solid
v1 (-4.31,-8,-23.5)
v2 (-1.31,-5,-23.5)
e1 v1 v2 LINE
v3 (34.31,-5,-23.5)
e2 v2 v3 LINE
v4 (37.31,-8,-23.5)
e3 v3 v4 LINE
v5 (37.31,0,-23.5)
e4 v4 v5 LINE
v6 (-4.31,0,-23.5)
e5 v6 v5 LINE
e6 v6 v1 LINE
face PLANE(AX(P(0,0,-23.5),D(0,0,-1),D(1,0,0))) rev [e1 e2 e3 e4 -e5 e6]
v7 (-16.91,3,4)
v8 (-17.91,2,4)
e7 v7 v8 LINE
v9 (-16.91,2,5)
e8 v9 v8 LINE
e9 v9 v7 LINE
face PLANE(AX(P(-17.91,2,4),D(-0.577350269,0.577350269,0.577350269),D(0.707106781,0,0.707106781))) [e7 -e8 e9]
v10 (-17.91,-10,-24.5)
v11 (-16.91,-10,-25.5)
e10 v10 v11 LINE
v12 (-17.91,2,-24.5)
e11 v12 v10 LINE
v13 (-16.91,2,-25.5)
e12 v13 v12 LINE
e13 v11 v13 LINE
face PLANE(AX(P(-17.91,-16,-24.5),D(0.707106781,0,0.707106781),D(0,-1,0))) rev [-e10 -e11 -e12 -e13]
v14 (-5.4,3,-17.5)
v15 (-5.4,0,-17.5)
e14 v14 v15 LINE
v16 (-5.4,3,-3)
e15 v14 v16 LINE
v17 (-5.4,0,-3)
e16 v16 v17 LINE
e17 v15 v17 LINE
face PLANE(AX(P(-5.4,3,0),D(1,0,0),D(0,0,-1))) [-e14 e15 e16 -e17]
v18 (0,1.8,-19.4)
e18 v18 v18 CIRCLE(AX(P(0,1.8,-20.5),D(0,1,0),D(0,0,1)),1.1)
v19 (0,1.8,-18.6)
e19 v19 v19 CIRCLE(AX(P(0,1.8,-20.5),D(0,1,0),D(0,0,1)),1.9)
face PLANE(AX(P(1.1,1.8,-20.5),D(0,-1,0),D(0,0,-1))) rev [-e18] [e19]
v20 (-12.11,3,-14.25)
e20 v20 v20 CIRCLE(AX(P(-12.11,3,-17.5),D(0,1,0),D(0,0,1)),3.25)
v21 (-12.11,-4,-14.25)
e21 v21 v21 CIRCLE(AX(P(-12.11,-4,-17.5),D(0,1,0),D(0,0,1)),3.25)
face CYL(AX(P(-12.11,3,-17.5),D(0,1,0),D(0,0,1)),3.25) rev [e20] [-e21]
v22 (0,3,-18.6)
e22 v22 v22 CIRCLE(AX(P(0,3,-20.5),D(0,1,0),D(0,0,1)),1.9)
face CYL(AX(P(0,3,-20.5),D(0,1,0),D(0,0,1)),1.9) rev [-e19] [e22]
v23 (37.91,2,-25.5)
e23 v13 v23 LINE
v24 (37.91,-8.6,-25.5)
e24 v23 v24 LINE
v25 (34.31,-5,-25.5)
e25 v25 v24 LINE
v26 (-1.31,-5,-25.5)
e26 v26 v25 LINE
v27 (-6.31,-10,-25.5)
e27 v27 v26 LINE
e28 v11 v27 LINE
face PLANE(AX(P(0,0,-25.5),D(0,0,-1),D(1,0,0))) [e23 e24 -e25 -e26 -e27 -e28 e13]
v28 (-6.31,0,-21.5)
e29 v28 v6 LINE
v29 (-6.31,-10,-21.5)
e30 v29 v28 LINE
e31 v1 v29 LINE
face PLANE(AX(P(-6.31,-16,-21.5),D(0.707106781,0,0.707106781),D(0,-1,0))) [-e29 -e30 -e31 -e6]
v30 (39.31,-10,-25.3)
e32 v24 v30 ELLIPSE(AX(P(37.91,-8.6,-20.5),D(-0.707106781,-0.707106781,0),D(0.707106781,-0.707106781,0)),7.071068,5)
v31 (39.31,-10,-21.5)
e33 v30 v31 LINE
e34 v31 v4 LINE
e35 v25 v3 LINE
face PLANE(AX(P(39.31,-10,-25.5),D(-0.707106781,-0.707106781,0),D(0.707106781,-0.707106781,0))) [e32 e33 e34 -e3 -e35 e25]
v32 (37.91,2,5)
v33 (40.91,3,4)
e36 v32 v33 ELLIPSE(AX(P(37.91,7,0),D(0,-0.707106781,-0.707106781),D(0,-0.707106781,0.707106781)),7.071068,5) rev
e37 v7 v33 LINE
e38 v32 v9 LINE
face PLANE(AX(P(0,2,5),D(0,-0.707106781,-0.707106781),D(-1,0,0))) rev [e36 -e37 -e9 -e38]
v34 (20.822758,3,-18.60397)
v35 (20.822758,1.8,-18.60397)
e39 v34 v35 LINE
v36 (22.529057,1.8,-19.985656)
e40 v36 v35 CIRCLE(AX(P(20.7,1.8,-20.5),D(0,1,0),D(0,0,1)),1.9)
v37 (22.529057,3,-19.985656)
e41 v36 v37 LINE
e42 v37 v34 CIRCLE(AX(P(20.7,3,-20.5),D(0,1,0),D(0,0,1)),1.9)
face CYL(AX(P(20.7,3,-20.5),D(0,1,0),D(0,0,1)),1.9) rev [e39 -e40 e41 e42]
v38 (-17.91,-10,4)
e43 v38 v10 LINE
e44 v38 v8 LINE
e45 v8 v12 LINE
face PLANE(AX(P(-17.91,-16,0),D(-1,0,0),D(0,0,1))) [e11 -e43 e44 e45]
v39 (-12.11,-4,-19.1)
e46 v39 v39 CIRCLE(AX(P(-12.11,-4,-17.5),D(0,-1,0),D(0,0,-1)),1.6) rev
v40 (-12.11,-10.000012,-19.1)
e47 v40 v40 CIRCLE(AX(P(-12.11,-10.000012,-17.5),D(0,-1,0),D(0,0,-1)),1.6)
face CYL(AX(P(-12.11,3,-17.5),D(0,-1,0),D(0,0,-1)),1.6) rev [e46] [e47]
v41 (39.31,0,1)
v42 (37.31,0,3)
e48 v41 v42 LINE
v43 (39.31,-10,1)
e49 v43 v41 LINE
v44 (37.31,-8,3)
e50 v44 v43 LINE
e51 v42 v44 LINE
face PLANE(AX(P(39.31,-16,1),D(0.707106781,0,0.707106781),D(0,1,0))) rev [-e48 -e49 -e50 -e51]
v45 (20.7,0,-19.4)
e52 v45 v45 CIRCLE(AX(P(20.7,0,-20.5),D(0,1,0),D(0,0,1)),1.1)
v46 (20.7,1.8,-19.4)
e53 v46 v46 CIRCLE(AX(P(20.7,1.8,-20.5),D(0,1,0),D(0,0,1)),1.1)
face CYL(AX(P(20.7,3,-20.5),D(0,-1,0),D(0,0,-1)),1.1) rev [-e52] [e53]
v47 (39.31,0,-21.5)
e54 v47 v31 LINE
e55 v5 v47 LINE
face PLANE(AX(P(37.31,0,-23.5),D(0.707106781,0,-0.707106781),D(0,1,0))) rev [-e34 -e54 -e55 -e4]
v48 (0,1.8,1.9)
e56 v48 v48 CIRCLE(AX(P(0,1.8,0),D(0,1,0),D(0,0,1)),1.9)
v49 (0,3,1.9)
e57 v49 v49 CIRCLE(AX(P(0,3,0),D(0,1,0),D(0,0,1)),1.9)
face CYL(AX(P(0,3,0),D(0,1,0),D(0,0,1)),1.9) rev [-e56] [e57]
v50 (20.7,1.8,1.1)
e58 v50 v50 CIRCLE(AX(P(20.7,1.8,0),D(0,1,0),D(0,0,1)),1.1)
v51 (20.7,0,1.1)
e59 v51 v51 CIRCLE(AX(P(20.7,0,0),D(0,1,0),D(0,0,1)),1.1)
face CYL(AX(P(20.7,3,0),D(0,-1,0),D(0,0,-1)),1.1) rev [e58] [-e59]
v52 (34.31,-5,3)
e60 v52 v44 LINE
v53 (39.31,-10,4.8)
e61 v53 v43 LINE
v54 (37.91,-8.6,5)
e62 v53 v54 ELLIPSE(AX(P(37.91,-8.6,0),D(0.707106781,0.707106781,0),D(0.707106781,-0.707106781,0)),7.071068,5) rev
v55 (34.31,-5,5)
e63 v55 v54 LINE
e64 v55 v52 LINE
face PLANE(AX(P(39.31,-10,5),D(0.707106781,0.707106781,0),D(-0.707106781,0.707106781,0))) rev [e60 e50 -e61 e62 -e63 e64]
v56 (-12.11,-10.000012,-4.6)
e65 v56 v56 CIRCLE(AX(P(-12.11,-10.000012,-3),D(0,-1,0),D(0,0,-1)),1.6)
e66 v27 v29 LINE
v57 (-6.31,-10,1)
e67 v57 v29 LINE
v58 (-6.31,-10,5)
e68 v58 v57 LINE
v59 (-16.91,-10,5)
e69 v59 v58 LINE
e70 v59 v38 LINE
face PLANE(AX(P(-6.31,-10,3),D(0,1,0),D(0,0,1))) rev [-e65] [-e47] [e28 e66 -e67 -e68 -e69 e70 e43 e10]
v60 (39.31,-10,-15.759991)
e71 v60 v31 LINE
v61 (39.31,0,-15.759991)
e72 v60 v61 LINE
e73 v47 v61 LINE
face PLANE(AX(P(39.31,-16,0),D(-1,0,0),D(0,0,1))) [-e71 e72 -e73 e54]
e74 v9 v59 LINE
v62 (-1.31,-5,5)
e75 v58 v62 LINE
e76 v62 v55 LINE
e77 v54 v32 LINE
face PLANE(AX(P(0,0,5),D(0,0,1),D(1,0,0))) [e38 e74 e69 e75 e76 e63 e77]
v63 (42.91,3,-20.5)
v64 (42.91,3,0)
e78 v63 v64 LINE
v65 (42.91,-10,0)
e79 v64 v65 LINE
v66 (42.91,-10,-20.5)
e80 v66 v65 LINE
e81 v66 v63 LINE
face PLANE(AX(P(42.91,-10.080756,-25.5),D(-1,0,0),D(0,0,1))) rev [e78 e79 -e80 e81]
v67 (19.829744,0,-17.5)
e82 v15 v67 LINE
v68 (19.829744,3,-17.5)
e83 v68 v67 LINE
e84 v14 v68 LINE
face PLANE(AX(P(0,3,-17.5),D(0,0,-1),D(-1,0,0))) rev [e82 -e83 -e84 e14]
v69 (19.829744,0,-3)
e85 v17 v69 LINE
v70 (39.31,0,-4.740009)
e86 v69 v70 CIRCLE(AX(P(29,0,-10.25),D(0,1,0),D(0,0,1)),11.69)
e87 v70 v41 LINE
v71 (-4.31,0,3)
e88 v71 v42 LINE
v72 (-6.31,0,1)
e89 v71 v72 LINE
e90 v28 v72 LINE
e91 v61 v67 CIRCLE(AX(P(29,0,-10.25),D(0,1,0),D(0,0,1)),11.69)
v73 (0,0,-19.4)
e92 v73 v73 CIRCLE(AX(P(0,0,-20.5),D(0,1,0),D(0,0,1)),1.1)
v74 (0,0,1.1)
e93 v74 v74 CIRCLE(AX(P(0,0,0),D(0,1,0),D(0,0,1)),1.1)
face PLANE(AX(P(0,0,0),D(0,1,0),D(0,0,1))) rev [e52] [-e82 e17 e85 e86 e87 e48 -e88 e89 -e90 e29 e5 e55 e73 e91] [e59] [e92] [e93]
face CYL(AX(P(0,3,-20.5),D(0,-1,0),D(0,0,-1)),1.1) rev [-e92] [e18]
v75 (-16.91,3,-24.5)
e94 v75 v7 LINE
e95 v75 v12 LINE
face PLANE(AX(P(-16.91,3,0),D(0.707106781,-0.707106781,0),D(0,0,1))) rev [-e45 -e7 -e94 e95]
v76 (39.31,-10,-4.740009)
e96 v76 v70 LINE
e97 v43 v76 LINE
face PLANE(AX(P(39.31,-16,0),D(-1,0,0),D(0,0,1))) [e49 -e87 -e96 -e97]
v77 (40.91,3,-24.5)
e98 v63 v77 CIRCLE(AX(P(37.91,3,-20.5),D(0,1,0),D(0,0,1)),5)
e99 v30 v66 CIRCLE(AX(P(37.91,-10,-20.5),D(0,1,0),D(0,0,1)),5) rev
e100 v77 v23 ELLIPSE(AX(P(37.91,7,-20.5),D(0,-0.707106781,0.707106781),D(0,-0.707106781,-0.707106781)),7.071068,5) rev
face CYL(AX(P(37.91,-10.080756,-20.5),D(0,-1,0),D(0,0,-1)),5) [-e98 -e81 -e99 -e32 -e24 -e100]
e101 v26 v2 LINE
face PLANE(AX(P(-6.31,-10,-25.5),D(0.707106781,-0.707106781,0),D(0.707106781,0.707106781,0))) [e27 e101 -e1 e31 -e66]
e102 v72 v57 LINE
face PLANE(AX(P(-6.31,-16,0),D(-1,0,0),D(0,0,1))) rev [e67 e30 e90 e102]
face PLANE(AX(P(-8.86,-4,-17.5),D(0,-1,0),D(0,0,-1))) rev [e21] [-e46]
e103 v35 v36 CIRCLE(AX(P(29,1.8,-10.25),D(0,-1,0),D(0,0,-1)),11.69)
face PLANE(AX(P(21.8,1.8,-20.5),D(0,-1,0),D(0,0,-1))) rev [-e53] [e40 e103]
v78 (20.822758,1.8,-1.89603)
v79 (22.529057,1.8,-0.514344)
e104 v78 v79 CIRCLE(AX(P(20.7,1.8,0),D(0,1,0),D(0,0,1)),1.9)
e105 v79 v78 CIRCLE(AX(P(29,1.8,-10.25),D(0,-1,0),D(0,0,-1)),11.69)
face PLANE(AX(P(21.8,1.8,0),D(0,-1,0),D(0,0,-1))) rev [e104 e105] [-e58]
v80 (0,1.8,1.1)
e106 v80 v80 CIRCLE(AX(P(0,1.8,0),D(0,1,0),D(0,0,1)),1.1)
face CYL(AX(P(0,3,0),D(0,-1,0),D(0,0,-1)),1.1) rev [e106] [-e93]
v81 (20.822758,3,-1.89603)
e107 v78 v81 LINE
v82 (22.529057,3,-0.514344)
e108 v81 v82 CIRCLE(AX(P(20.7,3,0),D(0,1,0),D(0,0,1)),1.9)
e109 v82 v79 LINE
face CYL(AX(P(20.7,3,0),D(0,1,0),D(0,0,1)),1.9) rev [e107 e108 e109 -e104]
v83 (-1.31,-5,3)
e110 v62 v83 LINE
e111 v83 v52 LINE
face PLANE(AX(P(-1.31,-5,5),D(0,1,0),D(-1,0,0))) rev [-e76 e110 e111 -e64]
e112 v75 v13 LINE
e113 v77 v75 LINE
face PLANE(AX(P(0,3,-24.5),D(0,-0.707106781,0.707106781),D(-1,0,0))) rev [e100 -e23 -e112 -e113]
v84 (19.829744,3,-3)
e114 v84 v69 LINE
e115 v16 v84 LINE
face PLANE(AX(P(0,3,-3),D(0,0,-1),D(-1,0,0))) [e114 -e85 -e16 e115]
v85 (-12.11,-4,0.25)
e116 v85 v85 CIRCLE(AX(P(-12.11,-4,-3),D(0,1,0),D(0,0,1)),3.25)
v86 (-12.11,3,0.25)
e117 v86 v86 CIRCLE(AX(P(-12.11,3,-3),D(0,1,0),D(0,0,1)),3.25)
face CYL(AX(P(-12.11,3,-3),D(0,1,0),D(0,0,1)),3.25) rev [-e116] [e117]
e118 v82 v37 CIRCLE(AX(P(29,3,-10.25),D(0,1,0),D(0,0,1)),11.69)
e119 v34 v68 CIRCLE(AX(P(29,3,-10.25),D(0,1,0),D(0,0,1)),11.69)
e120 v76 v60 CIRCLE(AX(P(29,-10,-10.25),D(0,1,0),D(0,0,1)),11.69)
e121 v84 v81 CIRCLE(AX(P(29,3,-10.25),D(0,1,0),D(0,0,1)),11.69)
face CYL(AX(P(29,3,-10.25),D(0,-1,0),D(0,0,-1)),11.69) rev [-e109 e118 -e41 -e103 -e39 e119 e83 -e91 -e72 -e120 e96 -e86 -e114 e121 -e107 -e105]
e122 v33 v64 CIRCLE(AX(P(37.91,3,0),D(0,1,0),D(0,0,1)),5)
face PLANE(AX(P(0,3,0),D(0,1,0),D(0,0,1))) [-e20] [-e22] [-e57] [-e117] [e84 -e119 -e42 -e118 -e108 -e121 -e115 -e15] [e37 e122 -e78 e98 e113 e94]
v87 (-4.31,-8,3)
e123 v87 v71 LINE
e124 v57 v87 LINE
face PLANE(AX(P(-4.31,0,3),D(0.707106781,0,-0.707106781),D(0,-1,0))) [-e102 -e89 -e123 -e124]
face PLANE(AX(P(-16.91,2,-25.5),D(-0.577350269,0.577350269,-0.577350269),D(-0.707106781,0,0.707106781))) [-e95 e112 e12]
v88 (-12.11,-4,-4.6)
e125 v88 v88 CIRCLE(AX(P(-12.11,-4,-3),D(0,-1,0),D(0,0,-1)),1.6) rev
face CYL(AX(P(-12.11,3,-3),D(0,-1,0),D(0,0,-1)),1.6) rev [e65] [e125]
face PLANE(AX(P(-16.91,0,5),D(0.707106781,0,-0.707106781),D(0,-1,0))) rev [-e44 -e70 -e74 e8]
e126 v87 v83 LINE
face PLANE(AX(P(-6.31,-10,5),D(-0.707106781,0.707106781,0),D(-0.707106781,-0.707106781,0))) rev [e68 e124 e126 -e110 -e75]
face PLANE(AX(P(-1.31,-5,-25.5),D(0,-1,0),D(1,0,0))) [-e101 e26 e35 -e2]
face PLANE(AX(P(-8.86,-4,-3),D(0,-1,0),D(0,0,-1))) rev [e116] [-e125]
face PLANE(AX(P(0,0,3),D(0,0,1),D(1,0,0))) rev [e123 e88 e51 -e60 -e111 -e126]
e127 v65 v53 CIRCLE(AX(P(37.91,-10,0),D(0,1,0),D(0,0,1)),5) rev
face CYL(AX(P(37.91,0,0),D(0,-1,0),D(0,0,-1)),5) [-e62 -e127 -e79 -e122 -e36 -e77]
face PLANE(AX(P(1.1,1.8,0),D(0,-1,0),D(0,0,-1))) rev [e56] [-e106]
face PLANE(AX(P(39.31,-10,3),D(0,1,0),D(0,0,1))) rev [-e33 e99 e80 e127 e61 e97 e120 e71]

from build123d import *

# Parameters (mm, degrees)
ESQUISSE1_W                                        = 53.8
ESQUISSE1_H                                        = 26.5
ESQUISSE1_R                                        = 1.1
BOSS_EXTRU_1_DEPTH                                 = 3
CHAMBRAGE_POUR_VIS_SIX_PANS_CREUX_M1_6_D           = 2.2
CHAMBRAGE_POUR_VIS_SIX_PANS_CREUX_M1_6_CBORE_D     = 3.8
CHAMBRAGE_POUR_VIS_SIX_PANS_CREUX_M1_6_CBORE_DEPTH = 1.2
BOSS_EXTRU_2_START                                 = 16
BOSS_EXTRU_2_DEPTH                                 = 19
ESQUISSE6_W                                        = 11.6
ESQUISSE6_H                                        = 6
ENL_V_MAT_EXTRU_1_DEPTH                            = 60.582531836
ENL_V_MAT_EXTRU_2_DEPTH                            = 58.559344159
ENL_V_MAT_EXTRU_2_DEPTH_BACK                       = 58.559344159
ESQUISSE7_R                                        = 1.6
PER_AGEAVANC_1_START                               = -4
PER_AGEAVANC_1_OUTLINE_R                           = 3.25
PER_AGEAVANC_1_OUTLINE_R_2                         = 1.6
PER_AGEAVANC_1_DEPTH                               = 7
BOSS_EXTRU_3_DEPTH                                 = 2
ESQUISSE11_R                                       = 3.860993261
BOSS_EXTRU_4_DEPTH                                 = 13
ESQUISSE12_W                                       = 8
ESQUISSE12_H                                       = 30.5
ENL_V_MAT_EXTRU_3_DEPTH                            = 59.404435619
CHANFREIN1_SIZE                                    = 1
CONG_1_R                                           = 5
CHANFREIN2_SIZE                                    = 2


with BuildPart() as part:
    # Esquisse1 → Boss.-Extru.1 (new body)
    with BuildSketch(Plane(origin=(0, 0, 0), x_dir=(1, 0, 0), z_dir=(0, 1, 0))):
        with Locations((16.5, 10.25)):
            Rectangle(ESQUISSE1_W, ESQUISSE1_H)
        with Locations(Location((0, 0, 0), (0, 0, 270))):
            Circle(ESQUISSE1_R, mode=Mode.SUBTRACT)
        with Locations(Location((20.7, 0, 0), (0, 0, 270))):
            Circle(ESQUISSE1_R, mode=Mode.SUBTRACT)
        with Locations(Location((0, 20.5, 0), (0, 0, 270))):
            Circle(ESQUISSE1_R, mode=Mode.SUBTRACT)
        with BuildLine():
            Line((-5.4, 3), (-5.4, 17.5))
            Line((-5.4, 17.5), (19.829743733, 17.5))
            ThreePointArc((19.829743733, 17.5), (32.837694897, 21.29211021), (40.69, 10.25))
            ThreePointArc((40.69, 10.25), (32.837694897, -0.79211021), (19.829743733, 3))
            Line((19.829743733, 3), (-5.4, 3))
        make_face(mode=Mode.SUBTRACT)
        with Locations(Location((20.7, 20.5, 0), (0, 0, 270))):
            Circle(ESQUISSE1_R, mode=Mode.SUBTRACT)
    extrude(amount=BOSS_EXTRU_1_DEPTH)

    # Chambrage pour vis à six pans creux M1.61 (through all)
    with Locations(Plane(origin=(0, 3, 0), x_dir=(1, 0, 0), z_dir=(0, 1, 0))):
        with Locations((0, 20.5), (20.7, 20.5), (20.7, 0), (0, 0)):
            CounterBoreHole(CHAMBRAGE_POUR_VIS_SIX_PANS_CREUX_M1_6_D / 2, CHAMBRAGE_POUR_VIS_SIX_PANS_CREUX_M1_6_CBORE_D / 2, CHAMBRAGE_POUR_VIS_SIX_PANS_CREUX_M1_6_CBORE_DEPTH)

    # Esquisse4 → Boss.-Extru.2 (add)
    with BuildSketch(Plane.XZ.offset(BOSS_EXTRU_2_START)):
        Polygon((-10.4, 3), (-17.91, 3), (-17.91, -23.5), (-10.4, -23.5), (-6.31, -23.5), (-6.31, 3), align=None)
        with BuildLine():
            Line((39.31, 3), (50.91, 3))
            Line((50.91, 3), (50.91, -23.5))
            Line((50.91, -23.5), (39.31, -23.5))
            Line((39.31, -23.5), (39.31, -15.759990926))
            ThreePointArc((39.31, -15.759990926), (40.69, -10.25), (39.31, -4.740009074))
            Line((39.31, -4.740009074), (39.31, 3))
        make_face()
    extrude(amount=-BOSS_EXTRU_2_DEPTH)

    # Esquisse6 → Enlèv. mat.-Extru.1 (cut, through all)
    with BuildSketch(Plane(origin=(0, 0, -23.5), x_dir=(-1, 0, 0), z_dir=(0, 0, -1))):
        with Locations((12.11, -13)):
            Rectangle(ESQUISSE6_W, ESQUISSE6_H)
        with Locations((-45.11, -13)):
            Rectangle(ESQUISSE6_W, ESQUISSE6_H)
    extrude(amount=-ENL_V_MAT_EXTRU_1_DEPTH, mode=Mode.SUBTRACT)

    # Esquisse7 → Enlèv. mat.-Extru.2 (cut, two sides: drawn at the far end of the back side and taken through both)
    with BuildSketch(Plane.XZ.offset(10).offset(-ENL_V_MAT_EXTRU_2_DEPTH_BACK)):
        with Locations(Location((-12.11, -3, 0), (0, 0, 270))):
            Circle(ESQUISSE7_R)
        with Locations(Location((-12.11, -17.5, 0), (0, 0, 270))):
            Circle(ESQUISSE7_R)
        with Locations(Location((45.11, -10.25, 0), (0, 0, 270))):
            Circle(ESQUISSE7_R)
    extrude(amount=ENL_V_MAT_EXTRU_2_DEPTH + ENL_V_MAT_EXTRU_2_DEPTH_BACK, mode=Mode.SUBTRACT)

    # PerçageAvancé1: read off the stored shape, not the designer's step
    # PerçageAvancé1 outline → PerçageAvancé1 (cut)
    # profile 1 of 3: a face of its own
    with BuildSketch(Plane(origin=(0, 0, 0), x_dir=(1, 0, 0), z_dir=(0, 1, 0)).offset(PER_AGEAVANC_1_START)):
        with Locations((-12.11, 17.5)):
            Circle(PER_AGEAVANC_1_OUTLINE_R)
        with Locations((-12.11, 17.5)):
            Circle(PER_AGEAVANC_1_OUTLINE_R_2, mode=Mode.SUBTRACT)
    # profile 2 of 3: a face of its own
    with BuildSketch(Plane(origin=(0, 0, 0), x_dir=(1, 0, 0), z_dir=(0, 1, 0)).offset(PER_AGEAVANC_1_START)):
        with Locations((-12.11, 3)):
            Circle(PER_AGEAVANC_1_OUTLINE_R)
        with Locations((-12.11, 3)):
            Circle(PER_AGEAVANC_1_OUTLINE_R_2, mode=Mode.SUBTRACT)
    # profile 3 of 3: a face of its own
    with BuildSketch(Plane(origin=(0, 0, 0), x_dir=(1, 0, 0), z_dir=(0, 1, 0)).offset(PER_AGEAVANC_1_START)):
        with Locations((45.11, 10.25)):
            Circle(PER_AGEAVANC_1_OUTLINE_R)
        with Locations((45.11, 10.25)):
            Circle(PER_AGEAVANC_1_OUTLINE_R_2, mode=Mode.SUBTRACT)
    extrude(amount=PER_AGEAVANC_1_DEPTH, mode=Mode.SUBTRACT)

    # Esquisse10 → Boss.-Extru.3 (add)
    with BuildSketch(Plane.XY.offset(3)):
        Polygon((-6.31, -10), (-1.31, -5), (34.31, -5), (39.31, -10), (50.91, -10), (50.91, 3), (-17.91, 3), (-17.91, -10), align=None)
    boss_extru_3 = extrude(amount=BOSS_EXTRU_3_DEPTH)

    # Symétrie1: Boss.-Extru.3 across plane
    add(boss_extru_3.mirror(Plane.XY.offset(-10.25)))

    # Esquisse11 → Boss.-Extru.4 (add)
    with BuildSketch(Plane(origin=(0, 3, 0), x_dir=(1, 0, 0), z_dir=(0, 1, 0))):
        with Locations((45.11, 10.25)):
            Circle(ESQUISSE11_R)
    extrude(amount=-BOSS_EXTRU_4_DEPTH)

    # Esquisse12 → Enlèv. mat.-Extru.3 (cut, through all)
    with BuildSketch(Plane(origin=(0, 3, 0), x_dir=(1, 0, 0), z_dir=(0, 1, 0))):
        with Locations((46.91, 10.25)):
            Rectangle(ESQUISSE12_W, ESQUISSE12_H)
    extrude(amount=-ENL_V_MAT_EXTRU_3_DEPTH, mode=Mode.SUBTRACT)

    # Chanfrein1
    chanfrein1_edges = [part.edges().sort_by_distance(p)[0] for p in [
        (-17.91, -3.5, 5),
        (-17.91, -3.5, -25.5),
        (12.5, 3, -25.5),
        (12.5, 3, 5),
        (-17.91, 3, -10.25),
    ]]
    chamfer(chanfrein1_edges, length=CHANFREIN1_SIZE)

    # Congé1
    cong_1_edges = [part.edges().sort_by_distance(p)[0] for p in [
        (42.91, -4, -25.5),
        (42.91, -4, 5),
    ]]
    fillet(cong_1_edges, radius=CONG_1_R)

    # Chanfrein2
    chanfrein2_edges = [part.edges().sort_by_distance(p)[0] for p in [
        (-6.31, -5, -23.5),
        (-6.31, -5, 3),
        (39.31, -5, 3),
        (39.31, -5, -23.5),
    ]]
    chamfer(chanfrein2_edges, length=CHANFREIN2_SIZE)


solid = part.part
